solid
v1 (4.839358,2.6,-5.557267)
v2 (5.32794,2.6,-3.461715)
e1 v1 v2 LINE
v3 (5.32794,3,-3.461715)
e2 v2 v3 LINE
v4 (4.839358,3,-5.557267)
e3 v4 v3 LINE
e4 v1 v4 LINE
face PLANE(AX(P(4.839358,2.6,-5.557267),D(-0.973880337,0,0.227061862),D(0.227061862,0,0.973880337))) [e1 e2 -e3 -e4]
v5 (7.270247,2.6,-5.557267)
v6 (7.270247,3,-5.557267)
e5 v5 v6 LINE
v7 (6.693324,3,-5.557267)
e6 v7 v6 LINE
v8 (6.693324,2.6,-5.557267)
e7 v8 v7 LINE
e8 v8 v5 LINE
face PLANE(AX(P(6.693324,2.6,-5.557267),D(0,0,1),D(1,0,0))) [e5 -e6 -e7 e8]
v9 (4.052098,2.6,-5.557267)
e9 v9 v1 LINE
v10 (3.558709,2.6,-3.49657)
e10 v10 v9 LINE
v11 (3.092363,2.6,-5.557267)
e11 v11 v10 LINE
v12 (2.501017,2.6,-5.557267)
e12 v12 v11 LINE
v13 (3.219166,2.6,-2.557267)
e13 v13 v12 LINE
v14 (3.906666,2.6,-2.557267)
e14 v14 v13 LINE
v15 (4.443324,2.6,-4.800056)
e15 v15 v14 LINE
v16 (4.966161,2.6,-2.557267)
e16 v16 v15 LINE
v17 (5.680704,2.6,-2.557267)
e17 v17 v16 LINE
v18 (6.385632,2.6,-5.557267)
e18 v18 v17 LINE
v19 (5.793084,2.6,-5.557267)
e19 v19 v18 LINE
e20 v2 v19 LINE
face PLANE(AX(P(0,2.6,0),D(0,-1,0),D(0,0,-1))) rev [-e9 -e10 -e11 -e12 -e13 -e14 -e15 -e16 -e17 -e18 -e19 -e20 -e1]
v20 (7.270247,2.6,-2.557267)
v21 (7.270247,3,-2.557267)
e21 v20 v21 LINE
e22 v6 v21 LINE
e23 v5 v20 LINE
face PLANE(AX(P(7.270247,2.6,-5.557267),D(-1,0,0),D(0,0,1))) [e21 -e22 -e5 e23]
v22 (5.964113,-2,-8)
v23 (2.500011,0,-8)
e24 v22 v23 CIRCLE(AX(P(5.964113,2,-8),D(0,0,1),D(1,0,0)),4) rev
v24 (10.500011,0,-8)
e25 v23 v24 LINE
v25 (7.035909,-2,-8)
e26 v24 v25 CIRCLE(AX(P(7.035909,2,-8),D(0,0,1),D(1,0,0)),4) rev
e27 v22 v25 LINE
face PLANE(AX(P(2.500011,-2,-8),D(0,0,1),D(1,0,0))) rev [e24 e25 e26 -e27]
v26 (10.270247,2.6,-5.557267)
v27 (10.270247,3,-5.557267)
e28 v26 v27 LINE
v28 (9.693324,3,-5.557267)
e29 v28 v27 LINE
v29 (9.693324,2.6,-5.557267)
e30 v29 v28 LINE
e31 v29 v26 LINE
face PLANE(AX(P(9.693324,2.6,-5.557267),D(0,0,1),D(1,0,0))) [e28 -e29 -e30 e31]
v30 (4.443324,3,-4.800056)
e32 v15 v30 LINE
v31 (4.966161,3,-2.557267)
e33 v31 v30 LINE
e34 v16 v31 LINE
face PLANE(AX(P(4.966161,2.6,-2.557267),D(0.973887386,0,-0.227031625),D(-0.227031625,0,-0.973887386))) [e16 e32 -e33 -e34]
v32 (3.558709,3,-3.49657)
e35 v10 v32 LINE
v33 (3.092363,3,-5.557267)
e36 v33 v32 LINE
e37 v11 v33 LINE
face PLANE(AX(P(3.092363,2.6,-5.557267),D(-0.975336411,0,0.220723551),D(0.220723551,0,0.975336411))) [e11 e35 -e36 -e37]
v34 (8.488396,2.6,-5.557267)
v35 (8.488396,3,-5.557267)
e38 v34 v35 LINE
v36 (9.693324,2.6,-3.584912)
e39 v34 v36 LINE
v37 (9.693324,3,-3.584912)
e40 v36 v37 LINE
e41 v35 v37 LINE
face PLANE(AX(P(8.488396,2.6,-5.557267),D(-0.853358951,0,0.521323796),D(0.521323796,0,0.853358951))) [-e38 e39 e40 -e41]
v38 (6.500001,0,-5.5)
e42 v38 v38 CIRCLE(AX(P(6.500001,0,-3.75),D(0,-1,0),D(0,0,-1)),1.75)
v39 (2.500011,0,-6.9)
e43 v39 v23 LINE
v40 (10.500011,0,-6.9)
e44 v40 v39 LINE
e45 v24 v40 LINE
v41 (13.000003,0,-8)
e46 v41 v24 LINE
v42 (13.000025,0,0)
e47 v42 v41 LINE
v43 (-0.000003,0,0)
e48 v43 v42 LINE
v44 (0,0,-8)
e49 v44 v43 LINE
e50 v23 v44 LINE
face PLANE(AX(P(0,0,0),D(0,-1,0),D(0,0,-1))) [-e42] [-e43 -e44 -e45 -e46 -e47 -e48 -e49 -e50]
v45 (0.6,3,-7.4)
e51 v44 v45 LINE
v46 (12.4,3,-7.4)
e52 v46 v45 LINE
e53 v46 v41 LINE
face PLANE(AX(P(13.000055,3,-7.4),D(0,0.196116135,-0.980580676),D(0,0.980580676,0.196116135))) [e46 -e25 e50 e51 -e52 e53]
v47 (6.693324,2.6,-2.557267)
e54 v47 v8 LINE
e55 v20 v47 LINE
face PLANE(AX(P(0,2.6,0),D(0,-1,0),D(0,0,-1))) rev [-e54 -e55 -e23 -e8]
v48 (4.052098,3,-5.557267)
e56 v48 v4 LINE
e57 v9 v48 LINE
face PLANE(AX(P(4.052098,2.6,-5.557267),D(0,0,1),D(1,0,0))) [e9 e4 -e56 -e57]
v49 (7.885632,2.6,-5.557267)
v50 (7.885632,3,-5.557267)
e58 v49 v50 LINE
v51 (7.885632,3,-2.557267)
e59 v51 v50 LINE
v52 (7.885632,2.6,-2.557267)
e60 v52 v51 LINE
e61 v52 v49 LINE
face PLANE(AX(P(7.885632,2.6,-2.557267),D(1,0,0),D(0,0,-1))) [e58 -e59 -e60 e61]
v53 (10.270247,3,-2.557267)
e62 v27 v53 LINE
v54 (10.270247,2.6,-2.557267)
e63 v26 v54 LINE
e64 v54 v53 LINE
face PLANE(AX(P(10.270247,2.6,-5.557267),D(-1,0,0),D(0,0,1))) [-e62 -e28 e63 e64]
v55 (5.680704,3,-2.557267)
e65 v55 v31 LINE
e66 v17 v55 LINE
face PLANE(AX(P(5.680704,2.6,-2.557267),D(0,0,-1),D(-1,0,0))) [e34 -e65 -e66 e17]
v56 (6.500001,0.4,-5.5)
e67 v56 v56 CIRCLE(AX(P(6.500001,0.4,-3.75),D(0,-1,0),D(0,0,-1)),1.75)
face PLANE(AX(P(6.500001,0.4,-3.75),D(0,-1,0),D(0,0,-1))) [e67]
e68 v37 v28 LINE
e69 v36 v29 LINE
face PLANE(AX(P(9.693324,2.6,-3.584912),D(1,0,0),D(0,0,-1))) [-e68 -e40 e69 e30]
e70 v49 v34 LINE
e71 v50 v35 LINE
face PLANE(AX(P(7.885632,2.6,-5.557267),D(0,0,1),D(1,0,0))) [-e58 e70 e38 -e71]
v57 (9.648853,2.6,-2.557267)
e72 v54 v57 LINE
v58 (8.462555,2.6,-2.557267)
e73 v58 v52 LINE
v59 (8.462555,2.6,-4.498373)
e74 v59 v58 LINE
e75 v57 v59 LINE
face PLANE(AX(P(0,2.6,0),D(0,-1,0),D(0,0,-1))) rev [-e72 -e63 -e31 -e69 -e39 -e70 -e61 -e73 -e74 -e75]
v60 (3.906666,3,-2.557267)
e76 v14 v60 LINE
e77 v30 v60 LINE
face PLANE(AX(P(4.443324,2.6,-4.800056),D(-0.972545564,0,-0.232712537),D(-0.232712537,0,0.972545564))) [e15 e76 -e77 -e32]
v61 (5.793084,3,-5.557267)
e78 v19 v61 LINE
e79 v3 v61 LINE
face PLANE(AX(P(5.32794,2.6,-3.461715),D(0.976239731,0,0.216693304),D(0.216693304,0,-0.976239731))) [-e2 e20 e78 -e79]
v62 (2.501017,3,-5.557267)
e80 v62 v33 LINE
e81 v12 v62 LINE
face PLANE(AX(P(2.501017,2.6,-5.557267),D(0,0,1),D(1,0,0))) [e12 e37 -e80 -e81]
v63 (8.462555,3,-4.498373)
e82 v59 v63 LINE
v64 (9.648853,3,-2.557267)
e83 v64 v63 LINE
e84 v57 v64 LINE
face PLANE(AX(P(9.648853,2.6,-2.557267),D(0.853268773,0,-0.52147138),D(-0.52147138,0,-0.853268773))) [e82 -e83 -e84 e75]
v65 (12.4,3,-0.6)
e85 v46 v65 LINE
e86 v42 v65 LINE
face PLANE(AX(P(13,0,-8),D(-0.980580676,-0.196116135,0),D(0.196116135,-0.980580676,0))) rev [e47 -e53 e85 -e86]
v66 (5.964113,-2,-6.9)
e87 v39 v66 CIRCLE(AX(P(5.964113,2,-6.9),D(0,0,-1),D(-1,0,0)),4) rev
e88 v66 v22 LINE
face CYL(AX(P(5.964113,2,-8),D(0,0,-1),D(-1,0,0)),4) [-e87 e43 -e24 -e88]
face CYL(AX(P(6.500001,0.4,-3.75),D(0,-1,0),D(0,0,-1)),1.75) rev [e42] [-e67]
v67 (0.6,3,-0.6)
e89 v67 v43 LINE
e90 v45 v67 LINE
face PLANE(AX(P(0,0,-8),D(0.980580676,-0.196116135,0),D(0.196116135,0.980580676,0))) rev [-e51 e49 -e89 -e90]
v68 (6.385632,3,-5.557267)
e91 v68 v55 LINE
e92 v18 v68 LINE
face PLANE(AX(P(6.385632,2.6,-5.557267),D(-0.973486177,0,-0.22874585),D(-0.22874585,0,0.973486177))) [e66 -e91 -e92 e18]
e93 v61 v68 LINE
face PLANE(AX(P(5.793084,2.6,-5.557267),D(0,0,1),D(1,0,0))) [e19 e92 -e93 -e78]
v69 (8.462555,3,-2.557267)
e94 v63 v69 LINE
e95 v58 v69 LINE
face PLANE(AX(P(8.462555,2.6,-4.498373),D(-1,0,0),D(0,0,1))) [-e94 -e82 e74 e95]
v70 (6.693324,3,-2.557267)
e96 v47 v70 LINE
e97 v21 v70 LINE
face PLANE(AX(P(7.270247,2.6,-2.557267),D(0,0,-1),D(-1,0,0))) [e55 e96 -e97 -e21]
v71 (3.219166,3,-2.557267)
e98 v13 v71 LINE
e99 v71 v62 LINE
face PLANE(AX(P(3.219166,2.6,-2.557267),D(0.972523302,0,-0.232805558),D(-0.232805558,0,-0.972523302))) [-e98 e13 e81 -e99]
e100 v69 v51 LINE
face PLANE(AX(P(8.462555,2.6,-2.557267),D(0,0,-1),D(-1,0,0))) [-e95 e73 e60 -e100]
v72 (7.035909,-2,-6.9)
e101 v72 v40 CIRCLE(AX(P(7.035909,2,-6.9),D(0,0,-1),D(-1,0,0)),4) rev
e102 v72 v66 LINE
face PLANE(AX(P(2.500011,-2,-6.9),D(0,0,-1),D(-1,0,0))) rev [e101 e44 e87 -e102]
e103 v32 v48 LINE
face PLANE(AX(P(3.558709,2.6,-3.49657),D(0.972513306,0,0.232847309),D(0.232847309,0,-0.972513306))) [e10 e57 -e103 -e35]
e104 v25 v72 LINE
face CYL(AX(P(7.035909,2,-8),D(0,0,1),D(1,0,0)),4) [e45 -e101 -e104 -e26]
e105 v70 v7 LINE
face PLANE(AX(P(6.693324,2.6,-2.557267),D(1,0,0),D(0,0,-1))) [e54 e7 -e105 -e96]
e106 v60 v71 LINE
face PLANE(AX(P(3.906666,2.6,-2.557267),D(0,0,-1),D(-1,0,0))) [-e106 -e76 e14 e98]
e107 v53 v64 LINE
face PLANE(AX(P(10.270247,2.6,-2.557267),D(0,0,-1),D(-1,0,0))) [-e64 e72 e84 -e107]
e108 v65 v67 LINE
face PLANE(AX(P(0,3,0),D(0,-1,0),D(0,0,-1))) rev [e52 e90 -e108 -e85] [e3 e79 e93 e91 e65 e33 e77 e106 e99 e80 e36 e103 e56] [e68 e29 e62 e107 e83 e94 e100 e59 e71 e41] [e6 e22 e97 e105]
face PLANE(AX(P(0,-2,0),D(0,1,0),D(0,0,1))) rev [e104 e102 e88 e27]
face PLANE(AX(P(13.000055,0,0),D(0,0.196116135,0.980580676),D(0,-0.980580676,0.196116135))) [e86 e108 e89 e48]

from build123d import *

# Parameters (mm, degrees)
SKETCH1_W               = 13
SKETCH1_H               = 8
BOSS_EXTRUDE1_DEPTH     = 3
CUT_EXTRUDE1_DEPTH      = 16.556349186
CUT_EXTRUDE1_DEPTH_BACK = 16.556349186
CUT_EXTRUDE2_DEPTH      = 16.556349186
CUT_EXTRUDE2_DEPTH_BACK = 16.556349186
SKETCH4_R               = 1.75
CUT_EXTRUDE3_DEPTH      = 0.4
SKETCH5_W               = 8
SKETCH5_H               = 1.1
BOSS_EXTRUDE2_DEPTH     = 2
FILLET1_R               = 4
SKETCH6_W               = 0.576923077
SKETCH6_H               = 3
CUT_EXTRUDE4_DEPTH      = 0.4


with BuildPart() as part:
    # Sketch1 → Boss-Extrude1 (new body)
    with BuildSketch(Plane(origin=(0, 0, 0), x_dir=(1, 0, 0), z_dir=(0, 1, 0))):
        with Locations((6.5, 4)):
            Rectangle(SKETCH1_W, SKETCH1_H)
    extrude(amount=BOSS_EXTRUDE1_DEPTH)

    # Sketch2 → Cut-Extrude1 (cut, two sides: drawn at the far end of the back side and taken through both)
    with BuildSketch(Plane.XY.offset(-CUT_EXTRUDE1_DEPTH_BACK)):
        Polygon((0, 0), (0.6, 3), (0, 3), align=None)
        Polygon((13, 0), (12.4, 3), (13, 3), align=None)
    extrude(amount=CUT_EXTRUDE1_DEPTH + CUT_EXTRUDE1_DEPTH_BACK, mode=Mode.SUBTRACT)

    # Sketch3 → Cut-Extrude2 (cut, two sides: drawn at the far end of the back side and taken through both)
    with BuildSketch(Plane(origin=(0, 0, 0), x_dir=(0, 0, -1), z_dir=(1, 0, 0)).offset(-CUT_EXTRUDE2_DEPTH_BACK)):
        Polygon((0, 0), (0.6, 3), (0, 3), align=None)
        Polygon((8, 3), (7.4, 3), (8, 0), align=None)
    extrude(amount=CUT_EXTRUDE2_DEPTH + CUT_EXTRUDE2_DEPTH_BACK, mode=Mode.SUBTRACT)

    # Sketch4 → Cut-Extrude3 (cut)
    with BuildSketch(Plane.XZ):
        with Locations(Location((6.50000125, -3.75, 0), (0, 0, 270))):
            Circle(SKETCH4_R)
    extrude(amount=-CUT_EXTRUDE3_DEPTH, mode=Mode.SUBTRACT)

    # Sketch5 → Boss-Extrude2 (add)
    with BuildSketch(Plane.XZ):
        with Locations((6.500011, -7.45)):
            Rectangle(SKETCH5_W, SKETCH5_H)
    extrude(amount=BOSS_EXTRUDE2_DEPTH)

    # Fillet1
    # the kernel refuses this fillet: 4 mm, written as the material it takes off along each edge
    with BuildSketch(Plane(origin=(10.500011, -2, -16.660254038), x_dir=(0, 1, 0), z_dir=(0, 0, 1)), Plane(origin=(2.500011, -2, 1.760254038), x_dir=(0, 1, 0), z_dir=(0, 0, -1))) as fillet1_piece_1:
        with BuildLine():
            CenterArc((4, 3.464101615), FILLET1_R, 180, 60)
            Line((0, 3.464101615), (-0.08, 3.464101615))
            Line((-0.08, 3.464101615), (-0.08, 0))
            Line((-0.08, 0), (0, -0.08))
            ThreePointArc((0, -0.08), (1, -0.08), (1.96, -0.069282032))
            Line((1.96, -0.069282032), (2, 0))
        make_face()
    extrude(amount=18.420508076, mode=Mode.SUBTRACT)

    # Sketch6 → Cut-Extrude4 (cut)
    with BuildSketch(Plane(origin=(0, 3, 0), x_dir=(1, 0, 0), z_dir=(0, 1, 0))):
        Polygon((3.219165588, 2.557267472), (2.50101655, 5.557267472), (3.092362704, 5.557267472), (3.558708858, 3.496570357), (4.052098281, 5.557267472), (4.839357896, 5.557267472), (5.327939627, 3.461714587), (5.793083858, 5.557267472), (6.385631934, 5.557267472), (5.68070405, 2.557267472), (4.966160781, 2.557267472), (4.443324242, 4.800055934), (3.906665588, 2.557267472), align=None)
        with Locations((6.981785781, 4.057267472)):
            Rectangle(SKETCH6_W, SKETCH6_H)
        Polygon((7.885631934, 2.557267472), (7.885631934, 5.557267472), (8.488396358, 5.557267472), (9.693324242, 3.584911703), (9.693324242, 5.557267472), (10.270247319, 5.557267472), (10.270247319, 2.557267472), (9.648853088, 2.557267472), (8.462555011, 4.498373241), (8.462555011, 2.557267472), align=None)
    extrude(amount=-CUT_EXTRUDE4_DEPTH, mode=Mode.SUBTRACT)


solid = part.part
